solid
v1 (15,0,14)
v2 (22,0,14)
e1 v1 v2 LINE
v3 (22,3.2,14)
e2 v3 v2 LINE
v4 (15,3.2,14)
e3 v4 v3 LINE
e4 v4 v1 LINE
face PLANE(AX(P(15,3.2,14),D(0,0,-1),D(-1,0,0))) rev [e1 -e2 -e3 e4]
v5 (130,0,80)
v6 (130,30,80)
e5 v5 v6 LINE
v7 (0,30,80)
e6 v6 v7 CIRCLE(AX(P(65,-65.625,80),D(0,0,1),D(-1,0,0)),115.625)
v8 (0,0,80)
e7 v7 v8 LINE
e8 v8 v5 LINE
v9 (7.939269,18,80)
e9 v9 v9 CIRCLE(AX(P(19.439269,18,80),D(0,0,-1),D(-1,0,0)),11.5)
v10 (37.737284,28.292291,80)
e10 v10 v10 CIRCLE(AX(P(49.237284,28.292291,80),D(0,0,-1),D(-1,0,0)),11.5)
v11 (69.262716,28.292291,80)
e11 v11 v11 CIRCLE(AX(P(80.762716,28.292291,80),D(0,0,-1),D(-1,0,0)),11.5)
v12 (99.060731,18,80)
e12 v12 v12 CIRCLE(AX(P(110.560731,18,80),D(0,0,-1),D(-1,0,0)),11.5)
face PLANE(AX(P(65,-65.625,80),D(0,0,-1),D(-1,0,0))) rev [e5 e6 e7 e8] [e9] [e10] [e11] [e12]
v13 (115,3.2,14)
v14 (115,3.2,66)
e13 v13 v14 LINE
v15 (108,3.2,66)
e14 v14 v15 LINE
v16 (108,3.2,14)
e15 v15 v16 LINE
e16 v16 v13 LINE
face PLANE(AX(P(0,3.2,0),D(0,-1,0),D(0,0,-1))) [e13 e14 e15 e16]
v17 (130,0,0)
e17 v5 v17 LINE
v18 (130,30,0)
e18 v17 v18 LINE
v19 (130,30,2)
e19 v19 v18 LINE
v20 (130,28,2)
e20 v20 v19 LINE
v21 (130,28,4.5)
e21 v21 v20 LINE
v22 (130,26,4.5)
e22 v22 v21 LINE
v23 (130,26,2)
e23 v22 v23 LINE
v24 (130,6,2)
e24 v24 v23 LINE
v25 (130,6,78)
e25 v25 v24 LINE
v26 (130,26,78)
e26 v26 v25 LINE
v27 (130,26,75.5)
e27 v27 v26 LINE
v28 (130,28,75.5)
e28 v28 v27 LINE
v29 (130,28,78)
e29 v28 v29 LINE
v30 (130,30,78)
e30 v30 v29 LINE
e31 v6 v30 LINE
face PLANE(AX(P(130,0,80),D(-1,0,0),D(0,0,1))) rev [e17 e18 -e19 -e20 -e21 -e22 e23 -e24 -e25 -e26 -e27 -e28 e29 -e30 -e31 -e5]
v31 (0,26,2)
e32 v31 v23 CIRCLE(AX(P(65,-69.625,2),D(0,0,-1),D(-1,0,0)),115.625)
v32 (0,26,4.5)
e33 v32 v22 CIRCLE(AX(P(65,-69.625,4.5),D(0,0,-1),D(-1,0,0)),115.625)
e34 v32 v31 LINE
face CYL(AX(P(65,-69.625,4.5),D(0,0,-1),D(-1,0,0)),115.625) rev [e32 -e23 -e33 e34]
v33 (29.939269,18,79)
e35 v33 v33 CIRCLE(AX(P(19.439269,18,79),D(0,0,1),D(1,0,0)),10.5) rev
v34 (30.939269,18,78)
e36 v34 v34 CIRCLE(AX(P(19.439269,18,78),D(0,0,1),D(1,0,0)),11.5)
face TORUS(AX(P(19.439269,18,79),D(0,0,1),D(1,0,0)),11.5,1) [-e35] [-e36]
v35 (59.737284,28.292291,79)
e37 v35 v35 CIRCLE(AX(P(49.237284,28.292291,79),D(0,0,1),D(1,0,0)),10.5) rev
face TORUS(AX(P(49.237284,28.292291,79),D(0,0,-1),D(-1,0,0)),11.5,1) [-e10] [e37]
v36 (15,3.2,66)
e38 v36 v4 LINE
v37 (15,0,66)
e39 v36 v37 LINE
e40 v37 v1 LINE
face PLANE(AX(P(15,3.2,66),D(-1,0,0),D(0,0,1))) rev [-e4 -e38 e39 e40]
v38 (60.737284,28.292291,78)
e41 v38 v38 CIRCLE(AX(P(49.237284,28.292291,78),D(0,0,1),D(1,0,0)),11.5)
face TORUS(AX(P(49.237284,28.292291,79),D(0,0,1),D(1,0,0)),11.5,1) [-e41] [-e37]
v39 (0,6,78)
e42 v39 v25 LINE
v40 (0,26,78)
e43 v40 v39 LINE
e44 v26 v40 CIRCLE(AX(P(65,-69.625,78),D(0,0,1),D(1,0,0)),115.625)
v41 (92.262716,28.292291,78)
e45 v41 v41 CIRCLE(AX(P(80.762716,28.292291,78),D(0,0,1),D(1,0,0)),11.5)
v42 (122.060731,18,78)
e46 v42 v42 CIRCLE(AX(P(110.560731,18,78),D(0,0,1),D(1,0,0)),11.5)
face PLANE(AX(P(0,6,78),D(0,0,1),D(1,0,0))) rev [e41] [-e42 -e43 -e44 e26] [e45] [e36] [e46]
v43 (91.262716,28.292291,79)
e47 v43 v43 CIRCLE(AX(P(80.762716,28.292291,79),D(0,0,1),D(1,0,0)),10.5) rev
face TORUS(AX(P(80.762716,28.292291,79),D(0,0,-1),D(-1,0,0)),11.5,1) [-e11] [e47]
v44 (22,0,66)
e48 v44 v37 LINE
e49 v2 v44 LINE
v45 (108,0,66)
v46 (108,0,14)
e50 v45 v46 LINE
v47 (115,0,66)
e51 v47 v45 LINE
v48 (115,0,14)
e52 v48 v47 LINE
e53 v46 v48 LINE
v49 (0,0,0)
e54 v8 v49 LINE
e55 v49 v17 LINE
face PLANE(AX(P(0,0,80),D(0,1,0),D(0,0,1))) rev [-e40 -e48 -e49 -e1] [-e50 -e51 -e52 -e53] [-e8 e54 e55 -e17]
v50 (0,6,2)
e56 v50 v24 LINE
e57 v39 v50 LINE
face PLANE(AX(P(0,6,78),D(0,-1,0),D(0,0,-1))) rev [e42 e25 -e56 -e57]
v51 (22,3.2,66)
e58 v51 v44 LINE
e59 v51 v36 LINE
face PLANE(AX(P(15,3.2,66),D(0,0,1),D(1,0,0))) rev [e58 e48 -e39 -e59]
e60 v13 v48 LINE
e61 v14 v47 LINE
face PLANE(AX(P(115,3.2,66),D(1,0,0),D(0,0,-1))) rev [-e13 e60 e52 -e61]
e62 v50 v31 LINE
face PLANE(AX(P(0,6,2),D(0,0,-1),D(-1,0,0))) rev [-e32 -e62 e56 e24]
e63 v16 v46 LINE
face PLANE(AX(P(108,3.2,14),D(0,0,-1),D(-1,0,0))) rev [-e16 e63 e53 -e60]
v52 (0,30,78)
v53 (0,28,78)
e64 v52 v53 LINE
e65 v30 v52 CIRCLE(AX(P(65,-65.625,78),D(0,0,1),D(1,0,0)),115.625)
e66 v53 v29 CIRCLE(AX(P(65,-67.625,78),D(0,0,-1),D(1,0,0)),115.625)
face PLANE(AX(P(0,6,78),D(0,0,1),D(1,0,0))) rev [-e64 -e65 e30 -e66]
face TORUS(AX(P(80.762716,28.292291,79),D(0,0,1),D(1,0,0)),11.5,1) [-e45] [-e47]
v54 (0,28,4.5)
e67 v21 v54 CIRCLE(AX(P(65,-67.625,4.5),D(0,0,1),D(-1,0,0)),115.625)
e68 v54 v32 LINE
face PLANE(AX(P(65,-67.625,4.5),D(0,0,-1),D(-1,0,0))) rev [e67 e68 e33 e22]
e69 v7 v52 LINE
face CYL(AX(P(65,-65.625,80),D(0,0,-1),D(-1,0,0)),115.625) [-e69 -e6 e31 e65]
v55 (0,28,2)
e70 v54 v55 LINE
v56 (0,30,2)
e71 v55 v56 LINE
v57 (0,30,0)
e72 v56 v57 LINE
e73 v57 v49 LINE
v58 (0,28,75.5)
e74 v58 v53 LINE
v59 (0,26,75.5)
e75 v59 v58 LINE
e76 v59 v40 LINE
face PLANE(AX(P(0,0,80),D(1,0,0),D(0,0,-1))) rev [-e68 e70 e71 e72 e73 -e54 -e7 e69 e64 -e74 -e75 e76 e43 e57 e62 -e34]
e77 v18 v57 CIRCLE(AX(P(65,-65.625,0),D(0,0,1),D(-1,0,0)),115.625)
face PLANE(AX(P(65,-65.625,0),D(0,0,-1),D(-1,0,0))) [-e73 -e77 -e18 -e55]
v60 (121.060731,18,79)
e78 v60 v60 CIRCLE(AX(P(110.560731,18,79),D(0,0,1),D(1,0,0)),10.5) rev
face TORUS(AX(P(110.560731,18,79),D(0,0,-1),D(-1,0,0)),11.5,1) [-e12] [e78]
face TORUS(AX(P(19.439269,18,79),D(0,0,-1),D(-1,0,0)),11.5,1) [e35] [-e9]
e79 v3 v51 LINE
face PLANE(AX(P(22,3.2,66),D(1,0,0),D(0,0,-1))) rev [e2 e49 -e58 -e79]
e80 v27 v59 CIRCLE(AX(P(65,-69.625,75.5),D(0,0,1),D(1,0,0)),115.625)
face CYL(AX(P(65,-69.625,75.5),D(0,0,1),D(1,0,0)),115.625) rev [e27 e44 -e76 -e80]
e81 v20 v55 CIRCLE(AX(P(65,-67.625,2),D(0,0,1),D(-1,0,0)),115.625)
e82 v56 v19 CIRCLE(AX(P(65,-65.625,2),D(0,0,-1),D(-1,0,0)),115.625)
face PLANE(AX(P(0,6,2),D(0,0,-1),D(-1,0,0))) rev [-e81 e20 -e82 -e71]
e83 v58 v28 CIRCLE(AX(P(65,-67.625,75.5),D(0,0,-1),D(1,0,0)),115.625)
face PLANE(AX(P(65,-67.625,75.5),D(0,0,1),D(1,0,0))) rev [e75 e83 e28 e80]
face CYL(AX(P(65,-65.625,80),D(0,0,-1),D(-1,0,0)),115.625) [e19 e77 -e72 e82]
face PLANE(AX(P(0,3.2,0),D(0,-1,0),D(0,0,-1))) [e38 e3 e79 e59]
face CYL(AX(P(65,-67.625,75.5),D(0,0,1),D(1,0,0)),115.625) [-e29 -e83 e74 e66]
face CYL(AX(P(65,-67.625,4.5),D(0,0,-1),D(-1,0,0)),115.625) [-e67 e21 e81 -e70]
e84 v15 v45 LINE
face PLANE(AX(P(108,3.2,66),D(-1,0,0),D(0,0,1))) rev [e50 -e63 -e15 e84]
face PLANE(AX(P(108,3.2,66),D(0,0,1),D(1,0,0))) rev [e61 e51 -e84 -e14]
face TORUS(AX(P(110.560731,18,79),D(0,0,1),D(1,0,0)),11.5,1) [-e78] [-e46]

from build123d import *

# Parameters (mm, degrees)
EXTRUDE_1_DEPTH     = 80
SKETCH_3_W          = 76
SKETCH_3_H          = 50.566144797
CUT_EXTRUDE_1_DEPTH = 161.623784042
SKETCH_4_R          = 10.5
CUT_EXTRUDE_2_DEPTH = 2
SKETCH_5_W          = 7
SKETCH_5_H          = 52
CUT_EXTRUDE_3_DEPTH = 3.2
FILLET_4_R          = 1
EXTRUDE_2_DEPTH     = 2.5
EXTRUDE_START       = 2.5
EXTRUDE_3_DEPTH     = 2.5


with BuildPart() as part:
    # Эскиз2 → Бобышка-Вытянуть1 (new body)
    with BuildSketch(Plane.XY):
        with BuildLine():
            Line((0, 0), (130, 0))
            Line((130, 0), (130, 30))
            ThreePointArc((130, 30), (65, 50), (0, 30))
            Line((0, 30), (0, 0))
        make_face()
    extrude(amount=EXTRUDE_1_DEPTH)

    # Эскиз3 → Вырез-Вытянуть1 (cut, through all)
    with BuildSketch(Plane(origin=(130, 0, 0), x_dir=(0, 0, -1), z_dir=(1, 0, 0))):
        with Locations((-40, 31.283072399)):
            Rectangle(SKETCH_3_W, SKETCH_3_H)
    extrude(amount=-CUT_EXTRUDE_1_DEPTH, mode=Mode.SUBTRACT)

    # Эскиз4 → Вырез-Вытянуть2 (cut)
    with BuildSketch(Plane.XY.offset(80)):
        with Locations((19.439269404, 18)):
            Circle(SKETCH_4_R)
        with Locations((49.237283637, 28.292291115)):
            Circle(SKETCH_4_R)
        with Locations((80.762716363, 28.292291115)):
            Circle(SKETCH_4_R)
        with Locations((110.560730596, 18)):
            Circle(SKETCH_4_R)
    extrude(amount=-CUT_EXTRUDE_2_DEPTH, mode=Mode.SUBTRACT)

    # Эскиз5 → Вырез-Вытянуть3 (cut)
    with BuildSketch(Plane.XZ):
        with Locations((18.5, 40)):
            Rectangle(SKETCH_5_W, SKETCH_5_H)
        with Locations((111.5, 40)):
            Rectangle(SKETCH_5_W, SKETCH_5_H)
    extrude(amount=-CUT_EXTRUDE_3_DEPTH, mode=Mode.SUBTRACT)

    # Скругление4
    fillet_4_edges = [part.edges().sort_by_distance(p)[0] for p in [
        (8.939269404, 18, 80),
        (8.939269404, 18, 78),
        (38.737283637, 28.292291115, 80),
        (38.737283637, 28.292291115, 78),
        (70.262716363, 28.292291115, 80),
        (70.262716363, 28.292291115, 78),
        (100.060730596, 18, 80),
        (100.060730596, 18, 78),
    ]]
    fillet(fillet_4_edges, radius=FILLET_4_R - 0.0001)  # a hair under: the kernel refuses the full size

    # Эскиз7 → Бобышка-Вытянуть2 (add)
    with BuildSketch(Plane(origin=(0, 0, 78), x_dir=(-1, 0, 0), z_dir=(0, 0, -1))):
        with BuildLine():
            Line((0, 26), (0, 28))
            ThreePointArc((0, 28), (-65, 48), (-130, 28))
            Line((-130, 28), (-130, 26))
            ThreePointArc((-130, 26), (-65, 46), (0, 26))
        make_face()
    extrude(amount=EXTRUDE_2_DEPTH)

    # Эскиз9 → Бобышка-Вытянуть3 (add)
    with BuildSketch(Plane.XY.offset(2).offset(EXTRUDE_START)):
        with BuildLine():
            Line((0, 26), (0, 28))
            ThreePointArc((0, 28), (65, 48), (130, 28))
            Line((130, 28), (130, 26))
            ThreePointArc((130, 26), (65, 46), (0, 26))
        make_face()
    extrude(amount=-EXTRUDE_3_DEPTH)


solid = part.part
